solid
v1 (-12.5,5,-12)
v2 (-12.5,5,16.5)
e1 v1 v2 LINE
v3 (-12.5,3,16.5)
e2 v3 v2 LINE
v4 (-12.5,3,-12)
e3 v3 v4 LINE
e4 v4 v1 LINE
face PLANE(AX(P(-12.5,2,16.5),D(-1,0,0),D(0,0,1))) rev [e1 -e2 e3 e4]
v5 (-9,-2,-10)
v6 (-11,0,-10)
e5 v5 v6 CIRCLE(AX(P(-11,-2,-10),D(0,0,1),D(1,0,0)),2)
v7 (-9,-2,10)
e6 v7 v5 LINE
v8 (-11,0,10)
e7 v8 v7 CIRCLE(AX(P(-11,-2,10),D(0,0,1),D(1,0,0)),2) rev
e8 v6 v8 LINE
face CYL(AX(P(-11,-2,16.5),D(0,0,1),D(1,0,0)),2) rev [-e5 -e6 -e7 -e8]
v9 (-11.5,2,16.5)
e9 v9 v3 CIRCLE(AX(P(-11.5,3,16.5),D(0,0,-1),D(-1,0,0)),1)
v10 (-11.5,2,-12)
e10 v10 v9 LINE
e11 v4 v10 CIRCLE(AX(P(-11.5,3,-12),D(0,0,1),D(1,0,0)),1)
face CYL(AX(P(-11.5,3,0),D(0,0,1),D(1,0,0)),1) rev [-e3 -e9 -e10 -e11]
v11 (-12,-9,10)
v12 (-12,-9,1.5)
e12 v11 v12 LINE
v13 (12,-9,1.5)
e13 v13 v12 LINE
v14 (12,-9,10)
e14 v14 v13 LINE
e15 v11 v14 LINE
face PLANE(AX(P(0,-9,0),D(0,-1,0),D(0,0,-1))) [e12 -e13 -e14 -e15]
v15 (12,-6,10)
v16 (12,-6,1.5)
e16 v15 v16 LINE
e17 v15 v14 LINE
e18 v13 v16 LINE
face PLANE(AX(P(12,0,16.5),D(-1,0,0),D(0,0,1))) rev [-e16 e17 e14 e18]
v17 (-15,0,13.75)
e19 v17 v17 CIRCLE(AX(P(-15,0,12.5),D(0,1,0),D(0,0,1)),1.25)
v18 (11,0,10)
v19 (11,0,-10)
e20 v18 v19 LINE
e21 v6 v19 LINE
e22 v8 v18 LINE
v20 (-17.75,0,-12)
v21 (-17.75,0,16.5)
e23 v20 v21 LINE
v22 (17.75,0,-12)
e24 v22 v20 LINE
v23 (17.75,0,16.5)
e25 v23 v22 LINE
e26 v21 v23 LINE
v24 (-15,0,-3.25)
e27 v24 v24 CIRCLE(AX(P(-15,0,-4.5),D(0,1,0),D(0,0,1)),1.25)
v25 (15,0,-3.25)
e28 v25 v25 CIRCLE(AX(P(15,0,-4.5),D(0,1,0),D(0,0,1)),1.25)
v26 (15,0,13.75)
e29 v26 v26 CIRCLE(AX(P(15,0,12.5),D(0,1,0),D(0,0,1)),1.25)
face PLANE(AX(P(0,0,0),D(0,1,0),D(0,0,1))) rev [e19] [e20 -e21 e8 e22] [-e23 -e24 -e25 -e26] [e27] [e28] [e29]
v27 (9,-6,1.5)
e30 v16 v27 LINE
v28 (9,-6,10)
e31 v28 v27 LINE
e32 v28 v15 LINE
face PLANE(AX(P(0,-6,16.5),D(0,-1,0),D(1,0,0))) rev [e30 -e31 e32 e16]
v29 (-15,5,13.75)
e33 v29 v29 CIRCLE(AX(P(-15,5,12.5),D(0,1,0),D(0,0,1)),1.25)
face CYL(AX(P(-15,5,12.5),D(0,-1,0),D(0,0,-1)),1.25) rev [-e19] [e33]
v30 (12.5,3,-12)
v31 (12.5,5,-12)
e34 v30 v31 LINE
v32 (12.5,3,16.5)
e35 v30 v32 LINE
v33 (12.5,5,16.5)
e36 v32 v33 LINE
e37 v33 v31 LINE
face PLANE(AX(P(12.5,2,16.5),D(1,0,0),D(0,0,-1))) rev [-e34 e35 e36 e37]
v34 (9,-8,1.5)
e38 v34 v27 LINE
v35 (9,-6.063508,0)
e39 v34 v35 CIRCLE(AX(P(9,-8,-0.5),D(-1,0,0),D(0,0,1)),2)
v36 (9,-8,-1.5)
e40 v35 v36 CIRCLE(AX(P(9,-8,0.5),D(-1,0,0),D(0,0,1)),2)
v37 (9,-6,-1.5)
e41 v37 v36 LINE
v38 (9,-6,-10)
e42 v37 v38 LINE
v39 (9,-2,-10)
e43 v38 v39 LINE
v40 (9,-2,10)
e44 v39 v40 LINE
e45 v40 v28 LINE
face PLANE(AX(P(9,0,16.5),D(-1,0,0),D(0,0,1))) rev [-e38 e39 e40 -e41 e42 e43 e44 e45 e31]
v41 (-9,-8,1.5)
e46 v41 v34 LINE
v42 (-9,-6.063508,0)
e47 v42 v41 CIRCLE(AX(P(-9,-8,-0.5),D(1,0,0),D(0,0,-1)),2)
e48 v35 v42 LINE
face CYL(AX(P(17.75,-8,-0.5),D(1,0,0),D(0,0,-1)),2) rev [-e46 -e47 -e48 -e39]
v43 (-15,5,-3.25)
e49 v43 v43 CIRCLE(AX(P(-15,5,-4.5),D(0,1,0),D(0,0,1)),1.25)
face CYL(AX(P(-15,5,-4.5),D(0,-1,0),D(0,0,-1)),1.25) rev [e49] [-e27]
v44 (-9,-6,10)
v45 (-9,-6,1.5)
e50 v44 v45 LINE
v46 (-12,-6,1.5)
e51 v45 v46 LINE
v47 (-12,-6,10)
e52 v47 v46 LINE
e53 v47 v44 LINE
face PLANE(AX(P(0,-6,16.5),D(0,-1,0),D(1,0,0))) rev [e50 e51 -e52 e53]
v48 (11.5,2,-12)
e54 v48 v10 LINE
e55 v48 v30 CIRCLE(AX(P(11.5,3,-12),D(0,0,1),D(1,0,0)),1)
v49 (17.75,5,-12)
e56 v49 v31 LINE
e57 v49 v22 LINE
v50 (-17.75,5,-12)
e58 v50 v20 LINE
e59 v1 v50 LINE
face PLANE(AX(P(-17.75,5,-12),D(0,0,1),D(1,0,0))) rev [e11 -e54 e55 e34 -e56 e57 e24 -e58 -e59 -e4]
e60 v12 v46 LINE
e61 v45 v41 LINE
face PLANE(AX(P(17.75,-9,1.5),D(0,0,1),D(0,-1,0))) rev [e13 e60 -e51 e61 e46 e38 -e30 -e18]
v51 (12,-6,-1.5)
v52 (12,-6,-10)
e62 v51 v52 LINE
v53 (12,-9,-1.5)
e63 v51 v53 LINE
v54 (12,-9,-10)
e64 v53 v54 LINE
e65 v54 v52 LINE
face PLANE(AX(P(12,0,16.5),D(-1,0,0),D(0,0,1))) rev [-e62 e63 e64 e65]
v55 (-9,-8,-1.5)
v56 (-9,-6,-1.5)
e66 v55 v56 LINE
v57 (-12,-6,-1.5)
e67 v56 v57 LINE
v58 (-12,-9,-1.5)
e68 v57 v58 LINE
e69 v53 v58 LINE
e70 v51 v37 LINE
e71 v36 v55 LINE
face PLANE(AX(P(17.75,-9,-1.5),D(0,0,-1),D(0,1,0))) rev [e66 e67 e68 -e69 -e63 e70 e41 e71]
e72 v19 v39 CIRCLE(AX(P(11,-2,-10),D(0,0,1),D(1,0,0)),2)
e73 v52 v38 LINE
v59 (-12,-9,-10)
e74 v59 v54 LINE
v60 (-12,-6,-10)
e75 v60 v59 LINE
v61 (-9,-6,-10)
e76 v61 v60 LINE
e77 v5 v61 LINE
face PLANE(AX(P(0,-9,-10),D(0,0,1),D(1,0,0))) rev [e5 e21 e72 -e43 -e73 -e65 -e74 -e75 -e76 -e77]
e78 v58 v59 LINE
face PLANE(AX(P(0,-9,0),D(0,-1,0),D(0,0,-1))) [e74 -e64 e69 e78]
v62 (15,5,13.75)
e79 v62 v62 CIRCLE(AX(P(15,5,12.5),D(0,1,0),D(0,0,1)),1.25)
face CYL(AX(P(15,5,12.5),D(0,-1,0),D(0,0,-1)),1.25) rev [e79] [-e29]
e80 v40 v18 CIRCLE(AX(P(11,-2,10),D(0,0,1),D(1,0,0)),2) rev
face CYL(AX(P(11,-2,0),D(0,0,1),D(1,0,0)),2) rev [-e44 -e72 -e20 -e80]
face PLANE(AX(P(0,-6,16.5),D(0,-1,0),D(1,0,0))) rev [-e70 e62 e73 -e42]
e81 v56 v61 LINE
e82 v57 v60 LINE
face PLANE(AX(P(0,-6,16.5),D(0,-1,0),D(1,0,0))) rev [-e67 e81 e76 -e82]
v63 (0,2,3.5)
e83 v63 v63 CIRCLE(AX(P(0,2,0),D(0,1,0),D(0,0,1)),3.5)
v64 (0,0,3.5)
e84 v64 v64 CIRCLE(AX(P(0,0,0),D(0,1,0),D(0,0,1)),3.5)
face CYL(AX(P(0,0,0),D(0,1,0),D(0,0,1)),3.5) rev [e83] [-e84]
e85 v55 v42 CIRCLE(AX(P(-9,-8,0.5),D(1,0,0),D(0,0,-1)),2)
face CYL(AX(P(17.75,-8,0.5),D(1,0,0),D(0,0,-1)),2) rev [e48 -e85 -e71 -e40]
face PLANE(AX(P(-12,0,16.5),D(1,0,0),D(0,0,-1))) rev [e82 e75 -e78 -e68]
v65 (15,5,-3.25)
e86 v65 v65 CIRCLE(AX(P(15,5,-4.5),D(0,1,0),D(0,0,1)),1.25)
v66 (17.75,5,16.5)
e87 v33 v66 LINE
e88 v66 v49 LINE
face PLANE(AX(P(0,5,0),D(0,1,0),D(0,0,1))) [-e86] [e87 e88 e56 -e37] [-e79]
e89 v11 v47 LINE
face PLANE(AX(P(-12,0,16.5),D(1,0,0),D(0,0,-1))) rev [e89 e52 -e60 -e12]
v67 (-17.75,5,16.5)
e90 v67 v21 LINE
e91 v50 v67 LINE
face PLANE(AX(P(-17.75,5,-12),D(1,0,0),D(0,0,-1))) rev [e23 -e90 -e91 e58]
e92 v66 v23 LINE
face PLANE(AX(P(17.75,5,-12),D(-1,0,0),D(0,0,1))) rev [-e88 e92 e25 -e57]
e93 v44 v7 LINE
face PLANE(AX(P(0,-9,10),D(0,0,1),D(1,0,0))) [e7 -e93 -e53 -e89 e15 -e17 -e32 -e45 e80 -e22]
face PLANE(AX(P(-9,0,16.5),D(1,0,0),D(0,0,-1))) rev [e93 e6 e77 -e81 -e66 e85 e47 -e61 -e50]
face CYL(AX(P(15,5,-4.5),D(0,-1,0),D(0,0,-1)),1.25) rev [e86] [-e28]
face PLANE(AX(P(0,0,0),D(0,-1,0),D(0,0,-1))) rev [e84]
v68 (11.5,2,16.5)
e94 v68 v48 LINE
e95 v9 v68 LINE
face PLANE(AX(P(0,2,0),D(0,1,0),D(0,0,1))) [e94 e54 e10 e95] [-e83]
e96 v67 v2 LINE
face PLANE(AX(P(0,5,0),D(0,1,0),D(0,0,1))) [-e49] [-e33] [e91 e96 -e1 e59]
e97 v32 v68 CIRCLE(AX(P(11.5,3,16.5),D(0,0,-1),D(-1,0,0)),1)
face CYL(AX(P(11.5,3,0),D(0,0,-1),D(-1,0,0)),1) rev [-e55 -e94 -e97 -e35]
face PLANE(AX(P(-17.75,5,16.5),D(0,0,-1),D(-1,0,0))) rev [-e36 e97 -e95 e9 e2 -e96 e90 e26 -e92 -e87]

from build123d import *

# Parameters (mm, degrees)
SKETCH1_W               = 35.5
SKETCH1_H               = 28.5
SKETCH1_R               = 1.25
BOSS_EXTRUDE1_DEPTH     = 5
SKETCH2_W               = 25
SKETCH2_H               = 28.5
SKETCH2_R               = 3.5
CUT_EXTRUDE1_DEPTH      = 3
CUT_EXTRUDE2_DEPTH      = 25.74494898
CUT_EXTRUDE2_DEPTH_BACK = 25.74494898
SKETCH3_R               = 3.5
FILLET1_R               = 1
SKETCH4_W               = 30
SKETCH4_H               = 20
BOSS_EXTRUDE5_DEPTH     = 9
CUT_EXTRUDE7_DEPTH      = 34.14079812
CUT_EXTRUDE7_DEPTH_BACK = 34.14079812
CUT_EXTRUDE8_DEPTH      = 36.189664676
CUT_EXTRUDE8_DEPTH_BACK = 36.189664676
SKETCH8_W               = 3
SKETCH8_H               = 3
FILLET2_R               = 2


with BuildPart() as part:
    # Sketch1 → Boss-Extrude1 (new body)
    with BuildSketch(Plane(origin=(0, 0, 0), x_dir=(1, 0, 0), z_dir=(0, 1, 0))):
        with Locations((0, -2.25)):
            Rectangle(SKETCH1_W, SKETCH1_H)
        with Locations(Location((-15, 4.5, 0), (0, 0, 270))):
            Circle(SKETCH1_R, mode=Mode.SUBTRACT)
        with Locations(Location((15, 4.5, 0), (0, 0, 270))):
            Circle(SKETCH1_R, mode=Mode.SUBTRACT)
        with Locations(Location((-15, -12.5, 0), (0, 0, 270))):
            Circle(SKETCH1_R, mode=Mode.SUBTRACT)
        with Locations(Location((15, -12.5, 0), (0, 0, 270))):
            Circle(SKETCH1_R, mode=Mode.SUBTRACT)
    extrude(amount=BOSS_EXTRUDE1_DEPTH)

    # Sketch2 → Cut-Extrude1 (cut)
    with BuildSketch(Plane(origin=(0, 5, 0), x_dir=(1, 0, 0), z_dir=(0, 1, 0))):
        with Locations((0, -2.25)):
            Rectangle(SKETCH2_W, SKETCH2_H)
        with Locations(Location((0, 0, 0), (0, 0, 270))):
            Circle(SKETCH2_R, mode=Mode.SUBTRACT)
    extrude(amount=-CUT_EXTRUDE1_DEPTH, mode=Mode.SUBTRACT)

    # Sketch3 → Cut-Extrude2 (cut, two sides: drawn at the far end of the back side and taken through both)
    with BuildSketch(Plane(origin=(0, 5, 0), x_dir=(1, 0, 0), z_dir=(0, 1, 0)).offset(-CUT_EXTRUDE2_DEPTH_BACK)):
        with Locations(Location((0, 0, 0), (0, 0, 270))):
            Circle(SKETCH3_R)
    extrude(amount=CUT_EXTRUDE2_DEPTH + CUT_EXTRUDE2_DEPTH_BACK, mode=Mode.SUBTRACT)

    # Fillet1
    fillet1_edges = [part.edges().sort_by_distance(p)[0] for p in [
        (12.5, 2, 2.25),
        (-12.5, 2, 2.25),
    ]]
    fillet(fillet1_edges, radius=FILLET1_R)

    # Sketch4 → Boss-Extrude5 (add)
    with BuildSketch(Plane.XZ):
        Rectangle(SKETCH4_W, SKETCH4_H)
    extrude(amount=BOSS_EXTRUDE5_DEPTH)

    # Sketch7 → Cut-Extrude7 (cut, two sides: drawn at the far end of the back side and taken through both)
    with BuildSketch(Plane(origin=(0, 0, -10), x_dir=(-1, 0, 0), z_dir=(0, 0, -1)).offset(-CUT_EXTRUDE7_DEPTH_BACK)):
        Polygon((12, -6), (12, -9), (15, -9), (15, 0), (9, 0), (9, -6), align=None)
        Polygon((-15, -9), (-12, -9), (-12, -6), (-9, -6), (-9, 0), (-15, 0), align=None)
    extrude(amount=CUT_EXTRUDE7_DEPTH + CUT_EXTRUDE7_DEPTH_BACK, mode=Mode.SUBTRACT)

    # Sketch8 → Cut-Extrude8 (cut, two sides: drawn at the far end of the back side and taken through both)
    with BuildSketch(Plane.ZY.offset(12).offset(-CUT_EXTRUDE8_DEPTH_BACK)):
        with Locations((0, -7.5)):
            Rectangle(SKETCH8_W, SKETCH8_H)
    extrude(amount=CUT_EXTRUDE8_DEPTH + CUT_EXTRUDE8_DEPTH_BACK, mode=Mode.SUBTRACT)

    # Fillet2
    # the kernel refuses this fillet: 2 mm, written as the material it adds along each edge
    with BuildSketch(Plane(origin=(9, 0, -10), x_dir=(1, 0, 0), z_dir=(0, 0, 1))) as fillet2_piece_1:
        with BuildLine():
            CenterArc((FILLET2_R, -FILLET2_R), FILLET2_R, 90, 90)
            Line((0, -FILLET2_R), (0, 0))
            Line((0, 0), (FILLET2_R, 0))
        make_face()
    extrude(amount=20)
    with BuildSketch(Plane(origin=(-9, 0, -10), x_dir=(-1, 0, 0), z_dir=(0, 0, 1))) as fillet2_piece_2:
        with BuildLine():
            CenterArc((FILLET2_R, FILLET2_R), FILLET2_R, 180, 90)
            Line((0, FILLET2_R), (0, 0))
            Line((0, 0), (FILLET2_R, 0))
        make_face()
    extrude(amount=20)
    with BuildSketch(Plane(origin=(-9, -6, -1.5), x_dir=(0, 0, 1), z_dir=(1, 0, 0)), Plane(origin=(9, -6, 1.5), x_dir=(0, 0, -1), z_dir=(-1, 0, 0))) as fillet2_piece_3:
        with BuildLine():
            CenterArc((FILLET2_R, FILLET2_R), FILLET2_R, 180, 90)
            Line((0, FILLET2_R), (0, 0))
            Line((0, 0), (FILLET2_R, 0))
        make_face()
    extrude(amount=18)


solid = part.part
